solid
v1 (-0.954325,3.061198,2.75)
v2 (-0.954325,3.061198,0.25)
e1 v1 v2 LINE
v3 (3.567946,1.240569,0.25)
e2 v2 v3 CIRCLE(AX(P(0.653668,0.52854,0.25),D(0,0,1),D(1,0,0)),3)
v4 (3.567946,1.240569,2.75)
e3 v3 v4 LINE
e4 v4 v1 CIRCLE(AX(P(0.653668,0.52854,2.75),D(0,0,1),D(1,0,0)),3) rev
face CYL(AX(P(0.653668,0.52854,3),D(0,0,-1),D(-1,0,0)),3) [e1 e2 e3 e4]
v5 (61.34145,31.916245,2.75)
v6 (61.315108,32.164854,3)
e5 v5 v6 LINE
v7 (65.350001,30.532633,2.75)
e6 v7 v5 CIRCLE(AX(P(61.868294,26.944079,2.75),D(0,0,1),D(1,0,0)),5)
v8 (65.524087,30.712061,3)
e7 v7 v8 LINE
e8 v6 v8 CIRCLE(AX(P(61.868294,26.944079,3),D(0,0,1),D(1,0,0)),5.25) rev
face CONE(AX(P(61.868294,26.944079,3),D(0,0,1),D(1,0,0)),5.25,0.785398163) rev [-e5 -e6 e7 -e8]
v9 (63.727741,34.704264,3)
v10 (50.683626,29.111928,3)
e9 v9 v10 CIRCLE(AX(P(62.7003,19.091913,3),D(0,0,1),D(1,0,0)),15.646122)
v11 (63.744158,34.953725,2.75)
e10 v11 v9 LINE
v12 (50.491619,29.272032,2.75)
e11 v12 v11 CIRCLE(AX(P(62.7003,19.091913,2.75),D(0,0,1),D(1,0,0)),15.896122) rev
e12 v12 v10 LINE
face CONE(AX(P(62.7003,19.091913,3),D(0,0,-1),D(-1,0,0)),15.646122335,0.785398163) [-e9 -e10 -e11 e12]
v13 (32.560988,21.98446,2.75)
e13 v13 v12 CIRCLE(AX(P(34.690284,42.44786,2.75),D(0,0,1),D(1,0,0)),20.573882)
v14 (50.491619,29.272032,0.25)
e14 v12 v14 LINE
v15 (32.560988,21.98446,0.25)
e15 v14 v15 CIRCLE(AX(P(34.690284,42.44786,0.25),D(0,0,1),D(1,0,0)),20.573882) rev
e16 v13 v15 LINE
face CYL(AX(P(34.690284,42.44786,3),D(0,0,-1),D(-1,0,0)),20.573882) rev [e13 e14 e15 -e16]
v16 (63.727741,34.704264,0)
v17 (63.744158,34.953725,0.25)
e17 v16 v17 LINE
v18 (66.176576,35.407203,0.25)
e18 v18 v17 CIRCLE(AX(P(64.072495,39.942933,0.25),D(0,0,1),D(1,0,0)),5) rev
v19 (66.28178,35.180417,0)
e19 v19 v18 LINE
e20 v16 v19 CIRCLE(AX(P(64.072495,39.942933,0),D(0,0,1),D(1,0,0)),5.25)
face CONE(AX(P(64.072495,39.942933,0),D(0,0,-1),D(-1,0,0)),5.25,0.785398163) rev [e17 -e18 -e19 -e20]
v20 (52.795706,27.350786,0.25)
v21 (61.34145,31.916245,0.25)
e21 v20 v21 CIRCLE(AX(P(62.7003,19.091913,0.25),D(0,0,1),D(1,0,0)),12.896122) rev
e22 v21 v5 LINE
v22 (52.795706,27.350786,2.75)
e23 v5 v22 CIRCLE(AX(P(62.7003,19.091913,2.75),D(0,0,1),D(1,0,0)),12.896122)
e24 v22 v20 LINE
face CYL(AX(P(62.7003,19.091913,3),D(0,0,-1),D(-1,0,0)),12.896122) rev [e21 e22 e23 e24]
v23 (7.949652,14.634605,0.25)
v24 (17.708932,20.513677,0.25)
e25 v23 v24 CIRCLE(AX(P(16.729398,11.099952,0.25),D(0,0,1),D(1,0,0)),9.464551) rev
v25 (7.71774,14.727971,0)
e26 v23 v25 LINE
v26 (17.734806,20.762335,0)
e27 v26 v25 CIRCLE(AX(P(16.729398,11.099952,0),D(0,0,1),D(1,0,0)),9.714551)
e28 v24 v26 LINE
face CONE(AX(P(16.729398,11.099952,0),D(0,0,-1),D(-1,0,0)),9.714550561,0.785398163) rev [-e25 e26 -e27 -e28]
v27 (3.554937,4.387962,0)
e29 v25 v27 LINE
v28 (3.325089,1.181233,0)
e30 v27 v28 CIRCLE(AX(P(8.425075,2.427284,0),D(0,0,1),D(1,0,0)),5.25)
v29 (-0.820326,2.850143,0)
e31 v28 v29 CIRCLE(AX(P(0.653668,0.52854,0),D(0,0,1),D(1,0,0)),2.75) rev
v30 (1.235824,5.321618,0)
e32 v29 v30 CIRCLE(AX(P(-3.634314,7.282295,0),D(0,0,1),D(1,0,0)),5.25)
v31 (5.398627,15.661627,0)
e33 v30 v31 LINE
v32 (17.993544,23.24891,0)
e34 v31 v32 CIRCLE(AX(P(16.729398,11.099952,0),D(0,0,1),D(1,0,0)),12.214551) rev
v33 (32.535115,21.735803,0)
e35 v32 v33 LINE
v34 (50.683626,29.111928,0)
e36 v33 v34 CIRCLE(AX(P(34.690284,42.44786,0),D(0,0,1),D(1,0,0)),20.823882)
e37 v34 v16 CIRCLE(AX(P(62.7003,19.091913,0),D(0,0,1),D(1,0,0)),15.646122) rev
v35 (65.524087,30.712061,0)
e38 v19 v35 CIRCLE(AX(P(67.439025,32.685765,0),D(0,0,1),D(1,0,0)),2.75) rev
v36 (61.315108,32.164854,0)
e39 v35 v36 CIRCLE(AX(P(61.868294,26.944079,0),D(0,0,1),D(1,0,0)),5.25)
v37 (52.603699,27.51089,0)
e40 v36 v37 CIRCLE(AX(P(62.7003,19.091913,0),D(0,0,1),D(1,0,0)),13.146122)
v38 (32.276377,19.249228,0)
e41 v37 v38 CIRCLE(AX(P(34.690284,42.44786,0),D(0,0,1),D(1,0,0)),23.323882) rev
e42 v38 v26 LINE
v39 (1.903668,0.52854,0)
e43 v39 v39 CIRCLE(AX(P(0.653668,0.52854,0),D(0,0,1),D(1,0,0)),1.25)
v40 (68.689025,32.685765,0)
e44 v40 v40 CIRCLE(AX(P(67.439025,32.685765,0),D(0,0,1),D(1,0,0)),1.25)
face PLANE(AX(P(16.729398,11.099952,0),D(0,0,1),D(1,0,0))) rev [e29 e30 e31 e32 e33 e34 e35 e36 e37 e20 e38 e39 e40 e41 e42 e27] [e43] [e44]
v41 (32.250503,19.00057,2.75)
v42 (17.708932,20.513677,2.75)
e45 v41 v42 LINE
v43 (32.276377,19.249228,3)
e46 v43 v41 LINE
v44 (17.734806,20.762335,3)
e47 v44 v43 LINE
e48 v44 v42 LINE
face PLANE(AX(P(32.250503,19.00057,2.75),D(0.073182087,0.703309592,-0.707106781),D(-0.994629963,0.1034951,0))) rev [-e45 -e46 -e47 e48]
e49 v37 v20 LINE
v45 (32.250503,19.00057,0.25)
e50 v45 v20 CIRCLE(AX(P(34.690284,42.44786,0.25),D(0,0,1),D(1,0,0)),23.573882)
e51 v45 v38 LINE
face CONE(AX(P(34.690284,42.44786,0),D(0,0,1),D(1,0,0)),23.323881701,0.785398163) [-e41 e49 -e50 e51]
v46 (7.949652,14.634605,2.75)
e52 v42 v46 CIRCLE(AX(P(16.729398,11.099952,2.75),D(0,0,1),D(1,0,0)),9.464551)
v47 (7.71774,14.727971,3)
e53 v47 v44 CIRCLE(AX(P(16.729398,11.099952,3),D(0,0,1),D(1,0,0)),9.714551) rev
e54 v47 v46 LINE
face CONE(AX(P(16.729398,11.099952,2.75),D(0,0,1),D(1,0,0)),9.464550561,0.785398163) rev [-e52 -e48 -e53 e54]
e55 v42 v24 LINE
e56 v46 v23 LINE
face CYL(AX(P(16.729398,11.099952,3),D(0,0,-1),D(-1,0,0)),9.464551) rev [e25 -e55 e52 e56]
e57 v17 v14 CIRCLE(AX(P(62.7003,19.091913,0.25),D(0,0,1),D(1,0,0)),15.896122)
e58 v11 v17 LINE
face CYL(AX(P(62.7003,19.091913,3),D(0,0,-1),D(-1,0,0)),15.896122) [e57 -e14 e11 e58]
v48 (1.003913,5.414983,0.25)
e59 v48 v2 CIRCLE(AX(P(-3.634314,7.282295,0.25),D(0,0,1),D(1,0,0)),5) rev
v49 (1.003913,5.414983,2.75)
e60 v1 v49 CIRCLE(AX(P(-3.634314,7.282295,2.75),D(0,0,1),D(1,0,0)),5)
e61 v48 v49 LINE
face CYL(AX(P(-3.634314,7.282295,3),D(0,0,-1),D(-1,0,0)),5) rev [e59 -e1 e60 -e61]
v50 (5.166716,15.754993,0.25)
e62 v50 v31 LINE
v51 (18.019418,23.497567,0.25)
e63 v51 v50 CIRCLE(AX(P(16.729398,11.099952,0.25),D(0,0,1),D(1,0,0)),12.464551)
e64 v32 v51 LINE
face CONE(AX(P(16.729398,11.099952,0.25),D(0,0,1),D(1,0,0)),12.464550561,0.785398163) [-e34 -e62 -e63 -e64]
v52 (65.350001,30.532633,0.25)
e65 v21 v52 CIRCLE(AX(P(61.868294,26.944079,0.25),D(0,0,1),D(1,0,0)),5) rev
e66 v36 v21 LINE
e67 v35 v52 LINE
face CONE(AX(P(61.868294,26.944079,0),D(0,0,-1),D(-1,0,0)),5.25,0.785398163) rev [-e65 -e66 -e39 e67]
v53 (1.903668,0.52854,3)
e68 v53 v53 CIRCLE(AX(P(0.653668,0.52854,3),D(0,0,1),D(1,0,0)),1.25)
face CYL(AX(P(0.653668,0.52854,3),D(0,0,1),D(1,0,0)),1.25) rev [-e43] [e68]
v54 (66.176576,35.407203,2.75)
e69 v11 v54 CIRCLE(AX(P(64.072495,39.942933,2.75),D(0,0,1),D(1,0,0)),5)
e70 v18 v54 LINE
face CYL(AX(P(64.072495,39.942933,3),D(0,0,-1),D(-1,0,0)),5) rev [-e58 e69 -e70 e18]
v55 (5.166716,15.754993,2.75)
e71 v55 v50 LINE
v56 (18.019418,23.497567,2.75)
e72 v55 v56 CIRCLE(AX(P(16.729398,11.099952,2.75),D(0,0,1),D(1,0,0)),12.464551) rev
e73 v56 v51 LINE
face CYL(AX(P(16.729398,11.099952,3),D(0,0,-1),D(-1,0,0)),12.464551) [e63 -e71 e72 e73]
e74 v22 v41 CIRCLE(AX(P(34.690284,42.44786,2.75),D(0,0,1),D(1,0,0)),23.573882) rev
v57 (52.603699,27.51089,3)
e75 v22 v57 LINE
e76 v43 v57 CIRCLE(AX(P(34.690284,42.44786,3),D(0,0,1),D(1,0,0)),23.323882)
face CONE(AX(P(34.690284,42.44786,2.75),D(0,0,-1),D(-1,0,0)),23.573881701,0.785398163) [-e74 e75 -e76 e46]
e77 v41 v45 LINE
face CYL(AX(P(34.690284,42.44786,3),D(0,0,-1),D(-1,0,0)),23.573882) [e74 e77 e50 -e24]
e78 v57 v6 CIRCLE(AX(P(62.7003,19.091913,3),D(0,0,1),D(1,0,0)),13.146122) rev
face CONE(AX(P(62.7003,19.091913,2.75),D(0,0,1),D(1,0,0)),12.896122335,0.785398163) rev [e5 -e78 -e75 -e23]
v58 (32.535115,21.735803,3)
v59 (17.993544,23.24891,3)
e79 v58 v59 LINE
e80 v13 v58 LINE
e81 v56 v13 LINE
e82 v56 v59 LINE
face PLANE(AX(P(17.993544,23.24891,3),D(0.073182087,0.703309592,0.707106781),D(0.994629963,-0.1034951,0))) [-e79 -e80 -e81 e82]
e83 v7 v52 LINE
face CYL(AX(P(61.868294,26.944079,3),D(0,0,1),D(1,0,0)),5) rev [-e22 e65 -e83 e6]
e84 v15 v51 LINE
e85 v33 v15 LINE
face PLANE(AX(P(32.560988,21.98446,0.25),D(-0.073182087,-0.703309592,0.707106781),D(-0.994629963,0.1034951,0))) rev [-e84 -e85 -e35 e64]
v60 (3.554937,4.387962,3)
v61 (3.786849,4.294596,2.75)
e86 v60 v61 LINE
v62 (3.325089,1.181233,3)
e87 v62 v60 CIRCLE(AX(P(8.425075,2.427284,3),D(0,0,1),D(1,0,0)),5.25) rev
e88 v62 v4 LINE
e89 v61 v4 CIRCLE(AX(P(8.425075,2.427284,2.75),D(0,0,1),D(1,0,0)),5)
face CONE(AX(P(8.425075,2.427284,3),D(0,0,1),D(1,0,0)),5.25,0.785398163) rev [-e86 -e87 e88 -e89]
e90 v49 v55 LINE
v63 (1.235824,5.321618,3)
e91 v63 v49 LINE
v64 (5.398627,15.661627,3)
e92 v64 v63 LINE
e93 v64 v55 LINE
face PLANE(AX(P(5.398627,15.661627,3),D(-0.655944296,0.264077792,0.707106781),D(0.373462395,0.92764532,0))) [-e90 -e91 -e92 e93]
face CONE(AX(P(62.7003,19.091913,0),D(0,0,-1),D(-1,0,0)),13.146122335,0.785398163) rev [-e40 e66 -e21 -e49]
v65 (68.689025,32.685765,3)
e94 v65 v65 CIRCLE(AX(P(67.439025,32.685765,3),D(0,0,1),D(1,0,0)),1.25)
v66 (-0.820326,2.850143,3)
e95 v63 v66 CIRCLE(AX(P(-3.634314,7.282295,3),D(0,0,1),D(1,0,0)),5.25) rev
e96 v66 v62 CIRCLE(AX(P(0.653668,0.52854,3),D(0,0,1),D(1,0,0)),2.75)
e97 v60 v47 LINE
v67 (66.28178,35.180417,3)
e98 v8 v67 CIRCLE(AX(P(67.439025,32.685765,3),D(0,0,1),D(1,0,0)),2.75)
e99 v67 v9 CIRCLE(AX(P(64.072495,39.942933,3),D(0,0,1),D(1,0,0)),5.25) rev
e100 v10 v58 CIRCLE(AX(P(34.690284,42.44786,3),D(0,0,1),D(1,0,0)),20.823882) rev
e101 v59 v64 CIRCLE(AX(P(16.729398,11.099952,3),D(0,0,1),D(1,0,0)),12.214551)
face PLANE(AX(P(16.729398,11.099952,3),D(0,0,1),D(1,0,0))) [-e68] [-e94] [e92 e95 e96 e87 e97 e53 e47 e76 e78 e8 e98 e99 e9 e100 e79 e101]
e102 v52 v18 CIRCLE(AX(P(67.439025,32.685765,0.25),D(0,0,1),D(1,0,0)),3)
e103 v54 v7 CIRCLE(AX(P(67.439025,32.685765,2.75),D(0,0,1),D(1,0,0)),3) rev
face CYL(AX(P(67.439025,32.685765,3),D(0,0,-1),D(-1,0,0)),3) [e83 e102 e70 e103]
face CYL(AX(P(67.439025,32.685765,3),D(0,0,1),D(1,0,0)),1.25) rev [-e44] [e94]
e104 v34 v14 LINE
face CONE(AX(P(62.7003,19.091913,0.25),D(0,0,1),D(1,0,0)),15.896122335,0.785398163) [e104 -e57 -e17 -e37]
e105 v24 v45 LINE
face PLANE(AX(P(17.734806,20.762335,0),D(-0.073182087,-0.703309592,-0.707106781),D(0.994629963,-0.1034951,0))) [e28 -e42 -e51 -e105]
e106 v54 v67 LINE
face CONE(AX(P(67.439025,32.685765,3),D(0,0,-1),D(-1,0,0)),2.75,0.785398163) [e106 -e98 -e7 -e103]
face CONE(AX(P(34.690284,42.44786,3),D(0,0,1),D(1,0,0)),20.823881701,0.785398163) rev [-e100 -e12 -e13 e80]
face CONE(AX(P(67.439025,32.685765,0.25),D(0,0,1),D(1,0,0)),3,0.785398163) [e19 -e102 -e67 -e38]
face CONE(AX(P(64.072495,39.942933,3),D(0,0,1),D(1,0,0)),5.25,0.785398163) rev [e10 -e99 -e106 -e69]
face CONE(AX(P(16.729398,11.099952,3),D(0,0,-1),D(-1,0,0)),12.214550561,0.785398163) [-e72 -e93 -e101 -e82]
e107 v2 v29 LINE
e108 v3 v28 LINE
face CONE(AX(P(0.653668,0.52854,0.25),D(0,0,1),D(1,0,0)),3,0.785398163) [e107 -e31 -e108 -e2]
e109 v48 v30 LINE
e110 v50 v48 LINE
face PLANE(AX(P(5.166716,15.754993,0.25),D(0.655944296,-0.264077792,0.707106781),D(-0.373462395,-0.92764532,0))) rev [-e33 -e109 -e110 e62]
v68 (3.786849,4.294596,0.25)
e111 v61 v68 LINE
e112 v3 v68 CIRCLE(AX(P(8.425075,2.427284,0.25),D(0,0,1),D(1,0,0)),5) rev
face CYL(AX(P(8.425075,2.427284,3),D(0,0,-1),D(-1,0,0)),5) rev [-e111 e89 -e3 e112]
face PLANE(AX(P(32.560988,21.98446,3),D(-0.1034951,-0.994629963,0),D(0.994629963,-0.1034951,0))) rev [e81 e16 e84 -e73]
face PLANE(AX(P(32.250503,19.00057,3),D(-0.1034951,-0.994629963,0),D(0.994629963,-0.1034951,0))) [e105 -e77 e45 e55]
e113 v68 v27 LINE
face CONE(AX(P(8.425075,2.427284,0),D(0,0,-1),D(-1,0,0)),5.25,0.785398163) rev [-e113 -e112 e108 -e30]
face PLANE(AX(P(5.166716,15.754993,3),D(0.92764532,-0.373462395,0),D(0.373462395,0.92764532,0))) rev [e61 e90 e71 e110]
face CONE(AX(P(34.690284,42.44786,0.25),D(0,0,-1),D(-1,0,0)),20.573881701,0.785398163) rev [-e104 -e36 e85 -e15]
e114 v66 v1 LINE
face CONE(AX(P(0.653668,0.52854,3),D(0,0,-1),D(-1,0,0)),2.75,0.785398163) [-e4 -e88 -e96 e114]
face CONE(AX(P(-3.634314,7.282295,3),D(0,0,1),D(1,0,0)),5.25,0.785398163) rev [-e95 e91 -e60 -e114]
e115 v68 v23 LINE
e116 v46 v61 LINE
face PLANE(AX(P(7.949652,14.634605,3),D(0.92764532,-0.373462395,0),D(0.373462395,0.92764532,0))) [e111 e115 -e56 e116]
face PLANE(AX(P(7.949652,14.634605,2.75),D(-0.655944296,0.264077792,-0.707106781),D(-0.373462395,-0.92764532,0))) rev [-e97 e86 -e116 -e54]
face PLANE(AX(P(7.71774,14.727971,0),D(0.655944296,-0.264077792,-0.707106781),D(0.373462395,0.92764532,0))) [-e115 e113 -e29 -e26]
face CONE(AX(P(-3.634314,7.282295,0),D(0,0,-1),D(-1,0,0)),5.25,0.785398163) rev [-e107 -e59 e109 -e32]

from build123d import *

# Parameters (mm, degrees)
EXTRUDE_THIN1_DEPTH   = 3
SKETCH1_3_R           = 3
BOSS_EXTRUDE1_DEPTH   = 3
FILLET1_R             = 5
F_2_5MM_DOWEL_HOLE1_D = 2.5
CHAMFER1_SIZE         = 0.25


with BuildPart() as part:
    # Sketch1 → Extrude-Thin1 (new body)
    with BuildSketch(Plane.XY):
        with BuildLine():
            ThreePointArc((67.932775445, 34.102173105), (58.457726976, 34.411419672), (50.491619232, 29.272032126))
            ThreePointArc((50.491619232, 29.272032126), (42.436789288, 23.388051771), (32.560988498, 21.984460302))
            Line((32.560988498, 21.984460302), (18.0194176, 23.497567077))
            ThreePointArc((18.0194176, 23.497567077), (10.297542455, 21.776854665), (5.1667157, 15.754992513))
            Line((5.1667157, 15.754992513), (-0.737799909, 1.088733357))
            Line((-0.737799909, 1.088733357), (2.04513605, -0.031653828))
            Line((2.04513605, -0.031653828), (7.949651659, 14.634605328))
            ThreePointArc((7.949651659, 14.634605328), (11.845577871, 19.207110251), (17.7089323, 20.513677186))
            Line((17.7089323, 20.513677186), (32.250503198, 19.000570412))
            ThreePointArc((32.250503198, 19.000570412), (43.566353212, 20.608827896), (52.795705795, 27.350786407))
            ThreePointArc((52.795705795, 27.350786407), (59.258407694, 31.520241644), (66.94527507, 31.269357719))
            Line((66.94527507, 31.269357719), (67.932775445, 34.102173105))
        make_face()
    extrude(amount=EXTRUDE_THIN1_DEPTH)

    # Sketch1<3> → Boss-Extrude1 (add, through all)
    with BuildSketch(Plane.XY):
        with Locations((0.653668071, 0.528539764)):
            Circle(SKETCH1_3_R)
        with Locations((67.439025258, 32.685765412)):
            Circle(SKETCH1_3_R)
    extrude(amount=BOSS_EXTRUDE1_DEPTH)

    # Fillet1
    fillet1_edges = [part.edges().sort_by_distance(p)[0] for p in [
        (0.232483855, 3.498826595, 1.5),
        (3.015419815, 2.37843941, 1.5),
        (64.556717413, 31.853718847, 1.5),
        (65.287195047, 34.77613063, 1.5),
    ]]
    fillet(fillet1_edges, radius=FILLET1_R)

    # Ø2.5mm Dowel Hole1 (through all)
    with Locations(Plane.XY.offset(3)):
        with Locations((67.439025258, 32.685765412), (0.653668071, 0.528539764)):
            Hole(F_2_5MM_DOWEL_HOLE1_D / 2)

    # Chamfer1
    chamfer1_edges = [part.edges().sort_by_distance(p)[0] for p in [
        (10.297542455, 21.776854665, 0),
        (25.290203049, 22.741013689, 0),
        (42.436789288, 23.388051771, 0),
        (43.566353212, 20.608827896, 0),
        (24.979717749, 19.757123799, 0),
        (5.868250185, 9.464600631, 3),
        (11.845577871, 19.207110251, 0),
        (5.868250185, 9.464600631, 0),
        (3.085314225, 10.584987816, 0),
        (11.845577871, 19.207110251, 3),
        (24.979717749, 19.757123799, 3),
        (43.566353212, 20.608827896, 3),
        (42.436789288, 23.388051771, 3),
        (25.290203049, 22.741013689, 3),
        (10.297542455, 21.776854665, 3),
        (3.085314225, 10.584987816, 3),
        (56.623528898, 30.466570313, 0),
        (56.623528898, 30.466570313, 3),
        (70.396803241, 32.184218401, 0),
        (70.396803241, 32.184218401, 3),
        (56.436616897, 33.701943285, 0),
        (56.436616897, 33.701943285, 3),
        (-0.466719115, -2.254396195, 3),
        (-0.466719115, -2.254396195, 0),
        (63.499669001, 31.670454016, 3),
        (63.499669001, 31.670454016, 0),
        (64.988861472, 35.027622491, 3),
        (64.988861472, 35.027622491, 0),
        (3.437869945, 2.784750939, 0),
        (3.437869945, 2.784750939, 3),
        (0.209401135, 4.084505995, 0),
        (0.209401135, 4.084505995, 3),
    ]]
    chamfer(chamfer1_edges, length=CHAMFER1_SIZE - 0.0001)  # a hair under: the kernel refuses the full size


solid = part.part
